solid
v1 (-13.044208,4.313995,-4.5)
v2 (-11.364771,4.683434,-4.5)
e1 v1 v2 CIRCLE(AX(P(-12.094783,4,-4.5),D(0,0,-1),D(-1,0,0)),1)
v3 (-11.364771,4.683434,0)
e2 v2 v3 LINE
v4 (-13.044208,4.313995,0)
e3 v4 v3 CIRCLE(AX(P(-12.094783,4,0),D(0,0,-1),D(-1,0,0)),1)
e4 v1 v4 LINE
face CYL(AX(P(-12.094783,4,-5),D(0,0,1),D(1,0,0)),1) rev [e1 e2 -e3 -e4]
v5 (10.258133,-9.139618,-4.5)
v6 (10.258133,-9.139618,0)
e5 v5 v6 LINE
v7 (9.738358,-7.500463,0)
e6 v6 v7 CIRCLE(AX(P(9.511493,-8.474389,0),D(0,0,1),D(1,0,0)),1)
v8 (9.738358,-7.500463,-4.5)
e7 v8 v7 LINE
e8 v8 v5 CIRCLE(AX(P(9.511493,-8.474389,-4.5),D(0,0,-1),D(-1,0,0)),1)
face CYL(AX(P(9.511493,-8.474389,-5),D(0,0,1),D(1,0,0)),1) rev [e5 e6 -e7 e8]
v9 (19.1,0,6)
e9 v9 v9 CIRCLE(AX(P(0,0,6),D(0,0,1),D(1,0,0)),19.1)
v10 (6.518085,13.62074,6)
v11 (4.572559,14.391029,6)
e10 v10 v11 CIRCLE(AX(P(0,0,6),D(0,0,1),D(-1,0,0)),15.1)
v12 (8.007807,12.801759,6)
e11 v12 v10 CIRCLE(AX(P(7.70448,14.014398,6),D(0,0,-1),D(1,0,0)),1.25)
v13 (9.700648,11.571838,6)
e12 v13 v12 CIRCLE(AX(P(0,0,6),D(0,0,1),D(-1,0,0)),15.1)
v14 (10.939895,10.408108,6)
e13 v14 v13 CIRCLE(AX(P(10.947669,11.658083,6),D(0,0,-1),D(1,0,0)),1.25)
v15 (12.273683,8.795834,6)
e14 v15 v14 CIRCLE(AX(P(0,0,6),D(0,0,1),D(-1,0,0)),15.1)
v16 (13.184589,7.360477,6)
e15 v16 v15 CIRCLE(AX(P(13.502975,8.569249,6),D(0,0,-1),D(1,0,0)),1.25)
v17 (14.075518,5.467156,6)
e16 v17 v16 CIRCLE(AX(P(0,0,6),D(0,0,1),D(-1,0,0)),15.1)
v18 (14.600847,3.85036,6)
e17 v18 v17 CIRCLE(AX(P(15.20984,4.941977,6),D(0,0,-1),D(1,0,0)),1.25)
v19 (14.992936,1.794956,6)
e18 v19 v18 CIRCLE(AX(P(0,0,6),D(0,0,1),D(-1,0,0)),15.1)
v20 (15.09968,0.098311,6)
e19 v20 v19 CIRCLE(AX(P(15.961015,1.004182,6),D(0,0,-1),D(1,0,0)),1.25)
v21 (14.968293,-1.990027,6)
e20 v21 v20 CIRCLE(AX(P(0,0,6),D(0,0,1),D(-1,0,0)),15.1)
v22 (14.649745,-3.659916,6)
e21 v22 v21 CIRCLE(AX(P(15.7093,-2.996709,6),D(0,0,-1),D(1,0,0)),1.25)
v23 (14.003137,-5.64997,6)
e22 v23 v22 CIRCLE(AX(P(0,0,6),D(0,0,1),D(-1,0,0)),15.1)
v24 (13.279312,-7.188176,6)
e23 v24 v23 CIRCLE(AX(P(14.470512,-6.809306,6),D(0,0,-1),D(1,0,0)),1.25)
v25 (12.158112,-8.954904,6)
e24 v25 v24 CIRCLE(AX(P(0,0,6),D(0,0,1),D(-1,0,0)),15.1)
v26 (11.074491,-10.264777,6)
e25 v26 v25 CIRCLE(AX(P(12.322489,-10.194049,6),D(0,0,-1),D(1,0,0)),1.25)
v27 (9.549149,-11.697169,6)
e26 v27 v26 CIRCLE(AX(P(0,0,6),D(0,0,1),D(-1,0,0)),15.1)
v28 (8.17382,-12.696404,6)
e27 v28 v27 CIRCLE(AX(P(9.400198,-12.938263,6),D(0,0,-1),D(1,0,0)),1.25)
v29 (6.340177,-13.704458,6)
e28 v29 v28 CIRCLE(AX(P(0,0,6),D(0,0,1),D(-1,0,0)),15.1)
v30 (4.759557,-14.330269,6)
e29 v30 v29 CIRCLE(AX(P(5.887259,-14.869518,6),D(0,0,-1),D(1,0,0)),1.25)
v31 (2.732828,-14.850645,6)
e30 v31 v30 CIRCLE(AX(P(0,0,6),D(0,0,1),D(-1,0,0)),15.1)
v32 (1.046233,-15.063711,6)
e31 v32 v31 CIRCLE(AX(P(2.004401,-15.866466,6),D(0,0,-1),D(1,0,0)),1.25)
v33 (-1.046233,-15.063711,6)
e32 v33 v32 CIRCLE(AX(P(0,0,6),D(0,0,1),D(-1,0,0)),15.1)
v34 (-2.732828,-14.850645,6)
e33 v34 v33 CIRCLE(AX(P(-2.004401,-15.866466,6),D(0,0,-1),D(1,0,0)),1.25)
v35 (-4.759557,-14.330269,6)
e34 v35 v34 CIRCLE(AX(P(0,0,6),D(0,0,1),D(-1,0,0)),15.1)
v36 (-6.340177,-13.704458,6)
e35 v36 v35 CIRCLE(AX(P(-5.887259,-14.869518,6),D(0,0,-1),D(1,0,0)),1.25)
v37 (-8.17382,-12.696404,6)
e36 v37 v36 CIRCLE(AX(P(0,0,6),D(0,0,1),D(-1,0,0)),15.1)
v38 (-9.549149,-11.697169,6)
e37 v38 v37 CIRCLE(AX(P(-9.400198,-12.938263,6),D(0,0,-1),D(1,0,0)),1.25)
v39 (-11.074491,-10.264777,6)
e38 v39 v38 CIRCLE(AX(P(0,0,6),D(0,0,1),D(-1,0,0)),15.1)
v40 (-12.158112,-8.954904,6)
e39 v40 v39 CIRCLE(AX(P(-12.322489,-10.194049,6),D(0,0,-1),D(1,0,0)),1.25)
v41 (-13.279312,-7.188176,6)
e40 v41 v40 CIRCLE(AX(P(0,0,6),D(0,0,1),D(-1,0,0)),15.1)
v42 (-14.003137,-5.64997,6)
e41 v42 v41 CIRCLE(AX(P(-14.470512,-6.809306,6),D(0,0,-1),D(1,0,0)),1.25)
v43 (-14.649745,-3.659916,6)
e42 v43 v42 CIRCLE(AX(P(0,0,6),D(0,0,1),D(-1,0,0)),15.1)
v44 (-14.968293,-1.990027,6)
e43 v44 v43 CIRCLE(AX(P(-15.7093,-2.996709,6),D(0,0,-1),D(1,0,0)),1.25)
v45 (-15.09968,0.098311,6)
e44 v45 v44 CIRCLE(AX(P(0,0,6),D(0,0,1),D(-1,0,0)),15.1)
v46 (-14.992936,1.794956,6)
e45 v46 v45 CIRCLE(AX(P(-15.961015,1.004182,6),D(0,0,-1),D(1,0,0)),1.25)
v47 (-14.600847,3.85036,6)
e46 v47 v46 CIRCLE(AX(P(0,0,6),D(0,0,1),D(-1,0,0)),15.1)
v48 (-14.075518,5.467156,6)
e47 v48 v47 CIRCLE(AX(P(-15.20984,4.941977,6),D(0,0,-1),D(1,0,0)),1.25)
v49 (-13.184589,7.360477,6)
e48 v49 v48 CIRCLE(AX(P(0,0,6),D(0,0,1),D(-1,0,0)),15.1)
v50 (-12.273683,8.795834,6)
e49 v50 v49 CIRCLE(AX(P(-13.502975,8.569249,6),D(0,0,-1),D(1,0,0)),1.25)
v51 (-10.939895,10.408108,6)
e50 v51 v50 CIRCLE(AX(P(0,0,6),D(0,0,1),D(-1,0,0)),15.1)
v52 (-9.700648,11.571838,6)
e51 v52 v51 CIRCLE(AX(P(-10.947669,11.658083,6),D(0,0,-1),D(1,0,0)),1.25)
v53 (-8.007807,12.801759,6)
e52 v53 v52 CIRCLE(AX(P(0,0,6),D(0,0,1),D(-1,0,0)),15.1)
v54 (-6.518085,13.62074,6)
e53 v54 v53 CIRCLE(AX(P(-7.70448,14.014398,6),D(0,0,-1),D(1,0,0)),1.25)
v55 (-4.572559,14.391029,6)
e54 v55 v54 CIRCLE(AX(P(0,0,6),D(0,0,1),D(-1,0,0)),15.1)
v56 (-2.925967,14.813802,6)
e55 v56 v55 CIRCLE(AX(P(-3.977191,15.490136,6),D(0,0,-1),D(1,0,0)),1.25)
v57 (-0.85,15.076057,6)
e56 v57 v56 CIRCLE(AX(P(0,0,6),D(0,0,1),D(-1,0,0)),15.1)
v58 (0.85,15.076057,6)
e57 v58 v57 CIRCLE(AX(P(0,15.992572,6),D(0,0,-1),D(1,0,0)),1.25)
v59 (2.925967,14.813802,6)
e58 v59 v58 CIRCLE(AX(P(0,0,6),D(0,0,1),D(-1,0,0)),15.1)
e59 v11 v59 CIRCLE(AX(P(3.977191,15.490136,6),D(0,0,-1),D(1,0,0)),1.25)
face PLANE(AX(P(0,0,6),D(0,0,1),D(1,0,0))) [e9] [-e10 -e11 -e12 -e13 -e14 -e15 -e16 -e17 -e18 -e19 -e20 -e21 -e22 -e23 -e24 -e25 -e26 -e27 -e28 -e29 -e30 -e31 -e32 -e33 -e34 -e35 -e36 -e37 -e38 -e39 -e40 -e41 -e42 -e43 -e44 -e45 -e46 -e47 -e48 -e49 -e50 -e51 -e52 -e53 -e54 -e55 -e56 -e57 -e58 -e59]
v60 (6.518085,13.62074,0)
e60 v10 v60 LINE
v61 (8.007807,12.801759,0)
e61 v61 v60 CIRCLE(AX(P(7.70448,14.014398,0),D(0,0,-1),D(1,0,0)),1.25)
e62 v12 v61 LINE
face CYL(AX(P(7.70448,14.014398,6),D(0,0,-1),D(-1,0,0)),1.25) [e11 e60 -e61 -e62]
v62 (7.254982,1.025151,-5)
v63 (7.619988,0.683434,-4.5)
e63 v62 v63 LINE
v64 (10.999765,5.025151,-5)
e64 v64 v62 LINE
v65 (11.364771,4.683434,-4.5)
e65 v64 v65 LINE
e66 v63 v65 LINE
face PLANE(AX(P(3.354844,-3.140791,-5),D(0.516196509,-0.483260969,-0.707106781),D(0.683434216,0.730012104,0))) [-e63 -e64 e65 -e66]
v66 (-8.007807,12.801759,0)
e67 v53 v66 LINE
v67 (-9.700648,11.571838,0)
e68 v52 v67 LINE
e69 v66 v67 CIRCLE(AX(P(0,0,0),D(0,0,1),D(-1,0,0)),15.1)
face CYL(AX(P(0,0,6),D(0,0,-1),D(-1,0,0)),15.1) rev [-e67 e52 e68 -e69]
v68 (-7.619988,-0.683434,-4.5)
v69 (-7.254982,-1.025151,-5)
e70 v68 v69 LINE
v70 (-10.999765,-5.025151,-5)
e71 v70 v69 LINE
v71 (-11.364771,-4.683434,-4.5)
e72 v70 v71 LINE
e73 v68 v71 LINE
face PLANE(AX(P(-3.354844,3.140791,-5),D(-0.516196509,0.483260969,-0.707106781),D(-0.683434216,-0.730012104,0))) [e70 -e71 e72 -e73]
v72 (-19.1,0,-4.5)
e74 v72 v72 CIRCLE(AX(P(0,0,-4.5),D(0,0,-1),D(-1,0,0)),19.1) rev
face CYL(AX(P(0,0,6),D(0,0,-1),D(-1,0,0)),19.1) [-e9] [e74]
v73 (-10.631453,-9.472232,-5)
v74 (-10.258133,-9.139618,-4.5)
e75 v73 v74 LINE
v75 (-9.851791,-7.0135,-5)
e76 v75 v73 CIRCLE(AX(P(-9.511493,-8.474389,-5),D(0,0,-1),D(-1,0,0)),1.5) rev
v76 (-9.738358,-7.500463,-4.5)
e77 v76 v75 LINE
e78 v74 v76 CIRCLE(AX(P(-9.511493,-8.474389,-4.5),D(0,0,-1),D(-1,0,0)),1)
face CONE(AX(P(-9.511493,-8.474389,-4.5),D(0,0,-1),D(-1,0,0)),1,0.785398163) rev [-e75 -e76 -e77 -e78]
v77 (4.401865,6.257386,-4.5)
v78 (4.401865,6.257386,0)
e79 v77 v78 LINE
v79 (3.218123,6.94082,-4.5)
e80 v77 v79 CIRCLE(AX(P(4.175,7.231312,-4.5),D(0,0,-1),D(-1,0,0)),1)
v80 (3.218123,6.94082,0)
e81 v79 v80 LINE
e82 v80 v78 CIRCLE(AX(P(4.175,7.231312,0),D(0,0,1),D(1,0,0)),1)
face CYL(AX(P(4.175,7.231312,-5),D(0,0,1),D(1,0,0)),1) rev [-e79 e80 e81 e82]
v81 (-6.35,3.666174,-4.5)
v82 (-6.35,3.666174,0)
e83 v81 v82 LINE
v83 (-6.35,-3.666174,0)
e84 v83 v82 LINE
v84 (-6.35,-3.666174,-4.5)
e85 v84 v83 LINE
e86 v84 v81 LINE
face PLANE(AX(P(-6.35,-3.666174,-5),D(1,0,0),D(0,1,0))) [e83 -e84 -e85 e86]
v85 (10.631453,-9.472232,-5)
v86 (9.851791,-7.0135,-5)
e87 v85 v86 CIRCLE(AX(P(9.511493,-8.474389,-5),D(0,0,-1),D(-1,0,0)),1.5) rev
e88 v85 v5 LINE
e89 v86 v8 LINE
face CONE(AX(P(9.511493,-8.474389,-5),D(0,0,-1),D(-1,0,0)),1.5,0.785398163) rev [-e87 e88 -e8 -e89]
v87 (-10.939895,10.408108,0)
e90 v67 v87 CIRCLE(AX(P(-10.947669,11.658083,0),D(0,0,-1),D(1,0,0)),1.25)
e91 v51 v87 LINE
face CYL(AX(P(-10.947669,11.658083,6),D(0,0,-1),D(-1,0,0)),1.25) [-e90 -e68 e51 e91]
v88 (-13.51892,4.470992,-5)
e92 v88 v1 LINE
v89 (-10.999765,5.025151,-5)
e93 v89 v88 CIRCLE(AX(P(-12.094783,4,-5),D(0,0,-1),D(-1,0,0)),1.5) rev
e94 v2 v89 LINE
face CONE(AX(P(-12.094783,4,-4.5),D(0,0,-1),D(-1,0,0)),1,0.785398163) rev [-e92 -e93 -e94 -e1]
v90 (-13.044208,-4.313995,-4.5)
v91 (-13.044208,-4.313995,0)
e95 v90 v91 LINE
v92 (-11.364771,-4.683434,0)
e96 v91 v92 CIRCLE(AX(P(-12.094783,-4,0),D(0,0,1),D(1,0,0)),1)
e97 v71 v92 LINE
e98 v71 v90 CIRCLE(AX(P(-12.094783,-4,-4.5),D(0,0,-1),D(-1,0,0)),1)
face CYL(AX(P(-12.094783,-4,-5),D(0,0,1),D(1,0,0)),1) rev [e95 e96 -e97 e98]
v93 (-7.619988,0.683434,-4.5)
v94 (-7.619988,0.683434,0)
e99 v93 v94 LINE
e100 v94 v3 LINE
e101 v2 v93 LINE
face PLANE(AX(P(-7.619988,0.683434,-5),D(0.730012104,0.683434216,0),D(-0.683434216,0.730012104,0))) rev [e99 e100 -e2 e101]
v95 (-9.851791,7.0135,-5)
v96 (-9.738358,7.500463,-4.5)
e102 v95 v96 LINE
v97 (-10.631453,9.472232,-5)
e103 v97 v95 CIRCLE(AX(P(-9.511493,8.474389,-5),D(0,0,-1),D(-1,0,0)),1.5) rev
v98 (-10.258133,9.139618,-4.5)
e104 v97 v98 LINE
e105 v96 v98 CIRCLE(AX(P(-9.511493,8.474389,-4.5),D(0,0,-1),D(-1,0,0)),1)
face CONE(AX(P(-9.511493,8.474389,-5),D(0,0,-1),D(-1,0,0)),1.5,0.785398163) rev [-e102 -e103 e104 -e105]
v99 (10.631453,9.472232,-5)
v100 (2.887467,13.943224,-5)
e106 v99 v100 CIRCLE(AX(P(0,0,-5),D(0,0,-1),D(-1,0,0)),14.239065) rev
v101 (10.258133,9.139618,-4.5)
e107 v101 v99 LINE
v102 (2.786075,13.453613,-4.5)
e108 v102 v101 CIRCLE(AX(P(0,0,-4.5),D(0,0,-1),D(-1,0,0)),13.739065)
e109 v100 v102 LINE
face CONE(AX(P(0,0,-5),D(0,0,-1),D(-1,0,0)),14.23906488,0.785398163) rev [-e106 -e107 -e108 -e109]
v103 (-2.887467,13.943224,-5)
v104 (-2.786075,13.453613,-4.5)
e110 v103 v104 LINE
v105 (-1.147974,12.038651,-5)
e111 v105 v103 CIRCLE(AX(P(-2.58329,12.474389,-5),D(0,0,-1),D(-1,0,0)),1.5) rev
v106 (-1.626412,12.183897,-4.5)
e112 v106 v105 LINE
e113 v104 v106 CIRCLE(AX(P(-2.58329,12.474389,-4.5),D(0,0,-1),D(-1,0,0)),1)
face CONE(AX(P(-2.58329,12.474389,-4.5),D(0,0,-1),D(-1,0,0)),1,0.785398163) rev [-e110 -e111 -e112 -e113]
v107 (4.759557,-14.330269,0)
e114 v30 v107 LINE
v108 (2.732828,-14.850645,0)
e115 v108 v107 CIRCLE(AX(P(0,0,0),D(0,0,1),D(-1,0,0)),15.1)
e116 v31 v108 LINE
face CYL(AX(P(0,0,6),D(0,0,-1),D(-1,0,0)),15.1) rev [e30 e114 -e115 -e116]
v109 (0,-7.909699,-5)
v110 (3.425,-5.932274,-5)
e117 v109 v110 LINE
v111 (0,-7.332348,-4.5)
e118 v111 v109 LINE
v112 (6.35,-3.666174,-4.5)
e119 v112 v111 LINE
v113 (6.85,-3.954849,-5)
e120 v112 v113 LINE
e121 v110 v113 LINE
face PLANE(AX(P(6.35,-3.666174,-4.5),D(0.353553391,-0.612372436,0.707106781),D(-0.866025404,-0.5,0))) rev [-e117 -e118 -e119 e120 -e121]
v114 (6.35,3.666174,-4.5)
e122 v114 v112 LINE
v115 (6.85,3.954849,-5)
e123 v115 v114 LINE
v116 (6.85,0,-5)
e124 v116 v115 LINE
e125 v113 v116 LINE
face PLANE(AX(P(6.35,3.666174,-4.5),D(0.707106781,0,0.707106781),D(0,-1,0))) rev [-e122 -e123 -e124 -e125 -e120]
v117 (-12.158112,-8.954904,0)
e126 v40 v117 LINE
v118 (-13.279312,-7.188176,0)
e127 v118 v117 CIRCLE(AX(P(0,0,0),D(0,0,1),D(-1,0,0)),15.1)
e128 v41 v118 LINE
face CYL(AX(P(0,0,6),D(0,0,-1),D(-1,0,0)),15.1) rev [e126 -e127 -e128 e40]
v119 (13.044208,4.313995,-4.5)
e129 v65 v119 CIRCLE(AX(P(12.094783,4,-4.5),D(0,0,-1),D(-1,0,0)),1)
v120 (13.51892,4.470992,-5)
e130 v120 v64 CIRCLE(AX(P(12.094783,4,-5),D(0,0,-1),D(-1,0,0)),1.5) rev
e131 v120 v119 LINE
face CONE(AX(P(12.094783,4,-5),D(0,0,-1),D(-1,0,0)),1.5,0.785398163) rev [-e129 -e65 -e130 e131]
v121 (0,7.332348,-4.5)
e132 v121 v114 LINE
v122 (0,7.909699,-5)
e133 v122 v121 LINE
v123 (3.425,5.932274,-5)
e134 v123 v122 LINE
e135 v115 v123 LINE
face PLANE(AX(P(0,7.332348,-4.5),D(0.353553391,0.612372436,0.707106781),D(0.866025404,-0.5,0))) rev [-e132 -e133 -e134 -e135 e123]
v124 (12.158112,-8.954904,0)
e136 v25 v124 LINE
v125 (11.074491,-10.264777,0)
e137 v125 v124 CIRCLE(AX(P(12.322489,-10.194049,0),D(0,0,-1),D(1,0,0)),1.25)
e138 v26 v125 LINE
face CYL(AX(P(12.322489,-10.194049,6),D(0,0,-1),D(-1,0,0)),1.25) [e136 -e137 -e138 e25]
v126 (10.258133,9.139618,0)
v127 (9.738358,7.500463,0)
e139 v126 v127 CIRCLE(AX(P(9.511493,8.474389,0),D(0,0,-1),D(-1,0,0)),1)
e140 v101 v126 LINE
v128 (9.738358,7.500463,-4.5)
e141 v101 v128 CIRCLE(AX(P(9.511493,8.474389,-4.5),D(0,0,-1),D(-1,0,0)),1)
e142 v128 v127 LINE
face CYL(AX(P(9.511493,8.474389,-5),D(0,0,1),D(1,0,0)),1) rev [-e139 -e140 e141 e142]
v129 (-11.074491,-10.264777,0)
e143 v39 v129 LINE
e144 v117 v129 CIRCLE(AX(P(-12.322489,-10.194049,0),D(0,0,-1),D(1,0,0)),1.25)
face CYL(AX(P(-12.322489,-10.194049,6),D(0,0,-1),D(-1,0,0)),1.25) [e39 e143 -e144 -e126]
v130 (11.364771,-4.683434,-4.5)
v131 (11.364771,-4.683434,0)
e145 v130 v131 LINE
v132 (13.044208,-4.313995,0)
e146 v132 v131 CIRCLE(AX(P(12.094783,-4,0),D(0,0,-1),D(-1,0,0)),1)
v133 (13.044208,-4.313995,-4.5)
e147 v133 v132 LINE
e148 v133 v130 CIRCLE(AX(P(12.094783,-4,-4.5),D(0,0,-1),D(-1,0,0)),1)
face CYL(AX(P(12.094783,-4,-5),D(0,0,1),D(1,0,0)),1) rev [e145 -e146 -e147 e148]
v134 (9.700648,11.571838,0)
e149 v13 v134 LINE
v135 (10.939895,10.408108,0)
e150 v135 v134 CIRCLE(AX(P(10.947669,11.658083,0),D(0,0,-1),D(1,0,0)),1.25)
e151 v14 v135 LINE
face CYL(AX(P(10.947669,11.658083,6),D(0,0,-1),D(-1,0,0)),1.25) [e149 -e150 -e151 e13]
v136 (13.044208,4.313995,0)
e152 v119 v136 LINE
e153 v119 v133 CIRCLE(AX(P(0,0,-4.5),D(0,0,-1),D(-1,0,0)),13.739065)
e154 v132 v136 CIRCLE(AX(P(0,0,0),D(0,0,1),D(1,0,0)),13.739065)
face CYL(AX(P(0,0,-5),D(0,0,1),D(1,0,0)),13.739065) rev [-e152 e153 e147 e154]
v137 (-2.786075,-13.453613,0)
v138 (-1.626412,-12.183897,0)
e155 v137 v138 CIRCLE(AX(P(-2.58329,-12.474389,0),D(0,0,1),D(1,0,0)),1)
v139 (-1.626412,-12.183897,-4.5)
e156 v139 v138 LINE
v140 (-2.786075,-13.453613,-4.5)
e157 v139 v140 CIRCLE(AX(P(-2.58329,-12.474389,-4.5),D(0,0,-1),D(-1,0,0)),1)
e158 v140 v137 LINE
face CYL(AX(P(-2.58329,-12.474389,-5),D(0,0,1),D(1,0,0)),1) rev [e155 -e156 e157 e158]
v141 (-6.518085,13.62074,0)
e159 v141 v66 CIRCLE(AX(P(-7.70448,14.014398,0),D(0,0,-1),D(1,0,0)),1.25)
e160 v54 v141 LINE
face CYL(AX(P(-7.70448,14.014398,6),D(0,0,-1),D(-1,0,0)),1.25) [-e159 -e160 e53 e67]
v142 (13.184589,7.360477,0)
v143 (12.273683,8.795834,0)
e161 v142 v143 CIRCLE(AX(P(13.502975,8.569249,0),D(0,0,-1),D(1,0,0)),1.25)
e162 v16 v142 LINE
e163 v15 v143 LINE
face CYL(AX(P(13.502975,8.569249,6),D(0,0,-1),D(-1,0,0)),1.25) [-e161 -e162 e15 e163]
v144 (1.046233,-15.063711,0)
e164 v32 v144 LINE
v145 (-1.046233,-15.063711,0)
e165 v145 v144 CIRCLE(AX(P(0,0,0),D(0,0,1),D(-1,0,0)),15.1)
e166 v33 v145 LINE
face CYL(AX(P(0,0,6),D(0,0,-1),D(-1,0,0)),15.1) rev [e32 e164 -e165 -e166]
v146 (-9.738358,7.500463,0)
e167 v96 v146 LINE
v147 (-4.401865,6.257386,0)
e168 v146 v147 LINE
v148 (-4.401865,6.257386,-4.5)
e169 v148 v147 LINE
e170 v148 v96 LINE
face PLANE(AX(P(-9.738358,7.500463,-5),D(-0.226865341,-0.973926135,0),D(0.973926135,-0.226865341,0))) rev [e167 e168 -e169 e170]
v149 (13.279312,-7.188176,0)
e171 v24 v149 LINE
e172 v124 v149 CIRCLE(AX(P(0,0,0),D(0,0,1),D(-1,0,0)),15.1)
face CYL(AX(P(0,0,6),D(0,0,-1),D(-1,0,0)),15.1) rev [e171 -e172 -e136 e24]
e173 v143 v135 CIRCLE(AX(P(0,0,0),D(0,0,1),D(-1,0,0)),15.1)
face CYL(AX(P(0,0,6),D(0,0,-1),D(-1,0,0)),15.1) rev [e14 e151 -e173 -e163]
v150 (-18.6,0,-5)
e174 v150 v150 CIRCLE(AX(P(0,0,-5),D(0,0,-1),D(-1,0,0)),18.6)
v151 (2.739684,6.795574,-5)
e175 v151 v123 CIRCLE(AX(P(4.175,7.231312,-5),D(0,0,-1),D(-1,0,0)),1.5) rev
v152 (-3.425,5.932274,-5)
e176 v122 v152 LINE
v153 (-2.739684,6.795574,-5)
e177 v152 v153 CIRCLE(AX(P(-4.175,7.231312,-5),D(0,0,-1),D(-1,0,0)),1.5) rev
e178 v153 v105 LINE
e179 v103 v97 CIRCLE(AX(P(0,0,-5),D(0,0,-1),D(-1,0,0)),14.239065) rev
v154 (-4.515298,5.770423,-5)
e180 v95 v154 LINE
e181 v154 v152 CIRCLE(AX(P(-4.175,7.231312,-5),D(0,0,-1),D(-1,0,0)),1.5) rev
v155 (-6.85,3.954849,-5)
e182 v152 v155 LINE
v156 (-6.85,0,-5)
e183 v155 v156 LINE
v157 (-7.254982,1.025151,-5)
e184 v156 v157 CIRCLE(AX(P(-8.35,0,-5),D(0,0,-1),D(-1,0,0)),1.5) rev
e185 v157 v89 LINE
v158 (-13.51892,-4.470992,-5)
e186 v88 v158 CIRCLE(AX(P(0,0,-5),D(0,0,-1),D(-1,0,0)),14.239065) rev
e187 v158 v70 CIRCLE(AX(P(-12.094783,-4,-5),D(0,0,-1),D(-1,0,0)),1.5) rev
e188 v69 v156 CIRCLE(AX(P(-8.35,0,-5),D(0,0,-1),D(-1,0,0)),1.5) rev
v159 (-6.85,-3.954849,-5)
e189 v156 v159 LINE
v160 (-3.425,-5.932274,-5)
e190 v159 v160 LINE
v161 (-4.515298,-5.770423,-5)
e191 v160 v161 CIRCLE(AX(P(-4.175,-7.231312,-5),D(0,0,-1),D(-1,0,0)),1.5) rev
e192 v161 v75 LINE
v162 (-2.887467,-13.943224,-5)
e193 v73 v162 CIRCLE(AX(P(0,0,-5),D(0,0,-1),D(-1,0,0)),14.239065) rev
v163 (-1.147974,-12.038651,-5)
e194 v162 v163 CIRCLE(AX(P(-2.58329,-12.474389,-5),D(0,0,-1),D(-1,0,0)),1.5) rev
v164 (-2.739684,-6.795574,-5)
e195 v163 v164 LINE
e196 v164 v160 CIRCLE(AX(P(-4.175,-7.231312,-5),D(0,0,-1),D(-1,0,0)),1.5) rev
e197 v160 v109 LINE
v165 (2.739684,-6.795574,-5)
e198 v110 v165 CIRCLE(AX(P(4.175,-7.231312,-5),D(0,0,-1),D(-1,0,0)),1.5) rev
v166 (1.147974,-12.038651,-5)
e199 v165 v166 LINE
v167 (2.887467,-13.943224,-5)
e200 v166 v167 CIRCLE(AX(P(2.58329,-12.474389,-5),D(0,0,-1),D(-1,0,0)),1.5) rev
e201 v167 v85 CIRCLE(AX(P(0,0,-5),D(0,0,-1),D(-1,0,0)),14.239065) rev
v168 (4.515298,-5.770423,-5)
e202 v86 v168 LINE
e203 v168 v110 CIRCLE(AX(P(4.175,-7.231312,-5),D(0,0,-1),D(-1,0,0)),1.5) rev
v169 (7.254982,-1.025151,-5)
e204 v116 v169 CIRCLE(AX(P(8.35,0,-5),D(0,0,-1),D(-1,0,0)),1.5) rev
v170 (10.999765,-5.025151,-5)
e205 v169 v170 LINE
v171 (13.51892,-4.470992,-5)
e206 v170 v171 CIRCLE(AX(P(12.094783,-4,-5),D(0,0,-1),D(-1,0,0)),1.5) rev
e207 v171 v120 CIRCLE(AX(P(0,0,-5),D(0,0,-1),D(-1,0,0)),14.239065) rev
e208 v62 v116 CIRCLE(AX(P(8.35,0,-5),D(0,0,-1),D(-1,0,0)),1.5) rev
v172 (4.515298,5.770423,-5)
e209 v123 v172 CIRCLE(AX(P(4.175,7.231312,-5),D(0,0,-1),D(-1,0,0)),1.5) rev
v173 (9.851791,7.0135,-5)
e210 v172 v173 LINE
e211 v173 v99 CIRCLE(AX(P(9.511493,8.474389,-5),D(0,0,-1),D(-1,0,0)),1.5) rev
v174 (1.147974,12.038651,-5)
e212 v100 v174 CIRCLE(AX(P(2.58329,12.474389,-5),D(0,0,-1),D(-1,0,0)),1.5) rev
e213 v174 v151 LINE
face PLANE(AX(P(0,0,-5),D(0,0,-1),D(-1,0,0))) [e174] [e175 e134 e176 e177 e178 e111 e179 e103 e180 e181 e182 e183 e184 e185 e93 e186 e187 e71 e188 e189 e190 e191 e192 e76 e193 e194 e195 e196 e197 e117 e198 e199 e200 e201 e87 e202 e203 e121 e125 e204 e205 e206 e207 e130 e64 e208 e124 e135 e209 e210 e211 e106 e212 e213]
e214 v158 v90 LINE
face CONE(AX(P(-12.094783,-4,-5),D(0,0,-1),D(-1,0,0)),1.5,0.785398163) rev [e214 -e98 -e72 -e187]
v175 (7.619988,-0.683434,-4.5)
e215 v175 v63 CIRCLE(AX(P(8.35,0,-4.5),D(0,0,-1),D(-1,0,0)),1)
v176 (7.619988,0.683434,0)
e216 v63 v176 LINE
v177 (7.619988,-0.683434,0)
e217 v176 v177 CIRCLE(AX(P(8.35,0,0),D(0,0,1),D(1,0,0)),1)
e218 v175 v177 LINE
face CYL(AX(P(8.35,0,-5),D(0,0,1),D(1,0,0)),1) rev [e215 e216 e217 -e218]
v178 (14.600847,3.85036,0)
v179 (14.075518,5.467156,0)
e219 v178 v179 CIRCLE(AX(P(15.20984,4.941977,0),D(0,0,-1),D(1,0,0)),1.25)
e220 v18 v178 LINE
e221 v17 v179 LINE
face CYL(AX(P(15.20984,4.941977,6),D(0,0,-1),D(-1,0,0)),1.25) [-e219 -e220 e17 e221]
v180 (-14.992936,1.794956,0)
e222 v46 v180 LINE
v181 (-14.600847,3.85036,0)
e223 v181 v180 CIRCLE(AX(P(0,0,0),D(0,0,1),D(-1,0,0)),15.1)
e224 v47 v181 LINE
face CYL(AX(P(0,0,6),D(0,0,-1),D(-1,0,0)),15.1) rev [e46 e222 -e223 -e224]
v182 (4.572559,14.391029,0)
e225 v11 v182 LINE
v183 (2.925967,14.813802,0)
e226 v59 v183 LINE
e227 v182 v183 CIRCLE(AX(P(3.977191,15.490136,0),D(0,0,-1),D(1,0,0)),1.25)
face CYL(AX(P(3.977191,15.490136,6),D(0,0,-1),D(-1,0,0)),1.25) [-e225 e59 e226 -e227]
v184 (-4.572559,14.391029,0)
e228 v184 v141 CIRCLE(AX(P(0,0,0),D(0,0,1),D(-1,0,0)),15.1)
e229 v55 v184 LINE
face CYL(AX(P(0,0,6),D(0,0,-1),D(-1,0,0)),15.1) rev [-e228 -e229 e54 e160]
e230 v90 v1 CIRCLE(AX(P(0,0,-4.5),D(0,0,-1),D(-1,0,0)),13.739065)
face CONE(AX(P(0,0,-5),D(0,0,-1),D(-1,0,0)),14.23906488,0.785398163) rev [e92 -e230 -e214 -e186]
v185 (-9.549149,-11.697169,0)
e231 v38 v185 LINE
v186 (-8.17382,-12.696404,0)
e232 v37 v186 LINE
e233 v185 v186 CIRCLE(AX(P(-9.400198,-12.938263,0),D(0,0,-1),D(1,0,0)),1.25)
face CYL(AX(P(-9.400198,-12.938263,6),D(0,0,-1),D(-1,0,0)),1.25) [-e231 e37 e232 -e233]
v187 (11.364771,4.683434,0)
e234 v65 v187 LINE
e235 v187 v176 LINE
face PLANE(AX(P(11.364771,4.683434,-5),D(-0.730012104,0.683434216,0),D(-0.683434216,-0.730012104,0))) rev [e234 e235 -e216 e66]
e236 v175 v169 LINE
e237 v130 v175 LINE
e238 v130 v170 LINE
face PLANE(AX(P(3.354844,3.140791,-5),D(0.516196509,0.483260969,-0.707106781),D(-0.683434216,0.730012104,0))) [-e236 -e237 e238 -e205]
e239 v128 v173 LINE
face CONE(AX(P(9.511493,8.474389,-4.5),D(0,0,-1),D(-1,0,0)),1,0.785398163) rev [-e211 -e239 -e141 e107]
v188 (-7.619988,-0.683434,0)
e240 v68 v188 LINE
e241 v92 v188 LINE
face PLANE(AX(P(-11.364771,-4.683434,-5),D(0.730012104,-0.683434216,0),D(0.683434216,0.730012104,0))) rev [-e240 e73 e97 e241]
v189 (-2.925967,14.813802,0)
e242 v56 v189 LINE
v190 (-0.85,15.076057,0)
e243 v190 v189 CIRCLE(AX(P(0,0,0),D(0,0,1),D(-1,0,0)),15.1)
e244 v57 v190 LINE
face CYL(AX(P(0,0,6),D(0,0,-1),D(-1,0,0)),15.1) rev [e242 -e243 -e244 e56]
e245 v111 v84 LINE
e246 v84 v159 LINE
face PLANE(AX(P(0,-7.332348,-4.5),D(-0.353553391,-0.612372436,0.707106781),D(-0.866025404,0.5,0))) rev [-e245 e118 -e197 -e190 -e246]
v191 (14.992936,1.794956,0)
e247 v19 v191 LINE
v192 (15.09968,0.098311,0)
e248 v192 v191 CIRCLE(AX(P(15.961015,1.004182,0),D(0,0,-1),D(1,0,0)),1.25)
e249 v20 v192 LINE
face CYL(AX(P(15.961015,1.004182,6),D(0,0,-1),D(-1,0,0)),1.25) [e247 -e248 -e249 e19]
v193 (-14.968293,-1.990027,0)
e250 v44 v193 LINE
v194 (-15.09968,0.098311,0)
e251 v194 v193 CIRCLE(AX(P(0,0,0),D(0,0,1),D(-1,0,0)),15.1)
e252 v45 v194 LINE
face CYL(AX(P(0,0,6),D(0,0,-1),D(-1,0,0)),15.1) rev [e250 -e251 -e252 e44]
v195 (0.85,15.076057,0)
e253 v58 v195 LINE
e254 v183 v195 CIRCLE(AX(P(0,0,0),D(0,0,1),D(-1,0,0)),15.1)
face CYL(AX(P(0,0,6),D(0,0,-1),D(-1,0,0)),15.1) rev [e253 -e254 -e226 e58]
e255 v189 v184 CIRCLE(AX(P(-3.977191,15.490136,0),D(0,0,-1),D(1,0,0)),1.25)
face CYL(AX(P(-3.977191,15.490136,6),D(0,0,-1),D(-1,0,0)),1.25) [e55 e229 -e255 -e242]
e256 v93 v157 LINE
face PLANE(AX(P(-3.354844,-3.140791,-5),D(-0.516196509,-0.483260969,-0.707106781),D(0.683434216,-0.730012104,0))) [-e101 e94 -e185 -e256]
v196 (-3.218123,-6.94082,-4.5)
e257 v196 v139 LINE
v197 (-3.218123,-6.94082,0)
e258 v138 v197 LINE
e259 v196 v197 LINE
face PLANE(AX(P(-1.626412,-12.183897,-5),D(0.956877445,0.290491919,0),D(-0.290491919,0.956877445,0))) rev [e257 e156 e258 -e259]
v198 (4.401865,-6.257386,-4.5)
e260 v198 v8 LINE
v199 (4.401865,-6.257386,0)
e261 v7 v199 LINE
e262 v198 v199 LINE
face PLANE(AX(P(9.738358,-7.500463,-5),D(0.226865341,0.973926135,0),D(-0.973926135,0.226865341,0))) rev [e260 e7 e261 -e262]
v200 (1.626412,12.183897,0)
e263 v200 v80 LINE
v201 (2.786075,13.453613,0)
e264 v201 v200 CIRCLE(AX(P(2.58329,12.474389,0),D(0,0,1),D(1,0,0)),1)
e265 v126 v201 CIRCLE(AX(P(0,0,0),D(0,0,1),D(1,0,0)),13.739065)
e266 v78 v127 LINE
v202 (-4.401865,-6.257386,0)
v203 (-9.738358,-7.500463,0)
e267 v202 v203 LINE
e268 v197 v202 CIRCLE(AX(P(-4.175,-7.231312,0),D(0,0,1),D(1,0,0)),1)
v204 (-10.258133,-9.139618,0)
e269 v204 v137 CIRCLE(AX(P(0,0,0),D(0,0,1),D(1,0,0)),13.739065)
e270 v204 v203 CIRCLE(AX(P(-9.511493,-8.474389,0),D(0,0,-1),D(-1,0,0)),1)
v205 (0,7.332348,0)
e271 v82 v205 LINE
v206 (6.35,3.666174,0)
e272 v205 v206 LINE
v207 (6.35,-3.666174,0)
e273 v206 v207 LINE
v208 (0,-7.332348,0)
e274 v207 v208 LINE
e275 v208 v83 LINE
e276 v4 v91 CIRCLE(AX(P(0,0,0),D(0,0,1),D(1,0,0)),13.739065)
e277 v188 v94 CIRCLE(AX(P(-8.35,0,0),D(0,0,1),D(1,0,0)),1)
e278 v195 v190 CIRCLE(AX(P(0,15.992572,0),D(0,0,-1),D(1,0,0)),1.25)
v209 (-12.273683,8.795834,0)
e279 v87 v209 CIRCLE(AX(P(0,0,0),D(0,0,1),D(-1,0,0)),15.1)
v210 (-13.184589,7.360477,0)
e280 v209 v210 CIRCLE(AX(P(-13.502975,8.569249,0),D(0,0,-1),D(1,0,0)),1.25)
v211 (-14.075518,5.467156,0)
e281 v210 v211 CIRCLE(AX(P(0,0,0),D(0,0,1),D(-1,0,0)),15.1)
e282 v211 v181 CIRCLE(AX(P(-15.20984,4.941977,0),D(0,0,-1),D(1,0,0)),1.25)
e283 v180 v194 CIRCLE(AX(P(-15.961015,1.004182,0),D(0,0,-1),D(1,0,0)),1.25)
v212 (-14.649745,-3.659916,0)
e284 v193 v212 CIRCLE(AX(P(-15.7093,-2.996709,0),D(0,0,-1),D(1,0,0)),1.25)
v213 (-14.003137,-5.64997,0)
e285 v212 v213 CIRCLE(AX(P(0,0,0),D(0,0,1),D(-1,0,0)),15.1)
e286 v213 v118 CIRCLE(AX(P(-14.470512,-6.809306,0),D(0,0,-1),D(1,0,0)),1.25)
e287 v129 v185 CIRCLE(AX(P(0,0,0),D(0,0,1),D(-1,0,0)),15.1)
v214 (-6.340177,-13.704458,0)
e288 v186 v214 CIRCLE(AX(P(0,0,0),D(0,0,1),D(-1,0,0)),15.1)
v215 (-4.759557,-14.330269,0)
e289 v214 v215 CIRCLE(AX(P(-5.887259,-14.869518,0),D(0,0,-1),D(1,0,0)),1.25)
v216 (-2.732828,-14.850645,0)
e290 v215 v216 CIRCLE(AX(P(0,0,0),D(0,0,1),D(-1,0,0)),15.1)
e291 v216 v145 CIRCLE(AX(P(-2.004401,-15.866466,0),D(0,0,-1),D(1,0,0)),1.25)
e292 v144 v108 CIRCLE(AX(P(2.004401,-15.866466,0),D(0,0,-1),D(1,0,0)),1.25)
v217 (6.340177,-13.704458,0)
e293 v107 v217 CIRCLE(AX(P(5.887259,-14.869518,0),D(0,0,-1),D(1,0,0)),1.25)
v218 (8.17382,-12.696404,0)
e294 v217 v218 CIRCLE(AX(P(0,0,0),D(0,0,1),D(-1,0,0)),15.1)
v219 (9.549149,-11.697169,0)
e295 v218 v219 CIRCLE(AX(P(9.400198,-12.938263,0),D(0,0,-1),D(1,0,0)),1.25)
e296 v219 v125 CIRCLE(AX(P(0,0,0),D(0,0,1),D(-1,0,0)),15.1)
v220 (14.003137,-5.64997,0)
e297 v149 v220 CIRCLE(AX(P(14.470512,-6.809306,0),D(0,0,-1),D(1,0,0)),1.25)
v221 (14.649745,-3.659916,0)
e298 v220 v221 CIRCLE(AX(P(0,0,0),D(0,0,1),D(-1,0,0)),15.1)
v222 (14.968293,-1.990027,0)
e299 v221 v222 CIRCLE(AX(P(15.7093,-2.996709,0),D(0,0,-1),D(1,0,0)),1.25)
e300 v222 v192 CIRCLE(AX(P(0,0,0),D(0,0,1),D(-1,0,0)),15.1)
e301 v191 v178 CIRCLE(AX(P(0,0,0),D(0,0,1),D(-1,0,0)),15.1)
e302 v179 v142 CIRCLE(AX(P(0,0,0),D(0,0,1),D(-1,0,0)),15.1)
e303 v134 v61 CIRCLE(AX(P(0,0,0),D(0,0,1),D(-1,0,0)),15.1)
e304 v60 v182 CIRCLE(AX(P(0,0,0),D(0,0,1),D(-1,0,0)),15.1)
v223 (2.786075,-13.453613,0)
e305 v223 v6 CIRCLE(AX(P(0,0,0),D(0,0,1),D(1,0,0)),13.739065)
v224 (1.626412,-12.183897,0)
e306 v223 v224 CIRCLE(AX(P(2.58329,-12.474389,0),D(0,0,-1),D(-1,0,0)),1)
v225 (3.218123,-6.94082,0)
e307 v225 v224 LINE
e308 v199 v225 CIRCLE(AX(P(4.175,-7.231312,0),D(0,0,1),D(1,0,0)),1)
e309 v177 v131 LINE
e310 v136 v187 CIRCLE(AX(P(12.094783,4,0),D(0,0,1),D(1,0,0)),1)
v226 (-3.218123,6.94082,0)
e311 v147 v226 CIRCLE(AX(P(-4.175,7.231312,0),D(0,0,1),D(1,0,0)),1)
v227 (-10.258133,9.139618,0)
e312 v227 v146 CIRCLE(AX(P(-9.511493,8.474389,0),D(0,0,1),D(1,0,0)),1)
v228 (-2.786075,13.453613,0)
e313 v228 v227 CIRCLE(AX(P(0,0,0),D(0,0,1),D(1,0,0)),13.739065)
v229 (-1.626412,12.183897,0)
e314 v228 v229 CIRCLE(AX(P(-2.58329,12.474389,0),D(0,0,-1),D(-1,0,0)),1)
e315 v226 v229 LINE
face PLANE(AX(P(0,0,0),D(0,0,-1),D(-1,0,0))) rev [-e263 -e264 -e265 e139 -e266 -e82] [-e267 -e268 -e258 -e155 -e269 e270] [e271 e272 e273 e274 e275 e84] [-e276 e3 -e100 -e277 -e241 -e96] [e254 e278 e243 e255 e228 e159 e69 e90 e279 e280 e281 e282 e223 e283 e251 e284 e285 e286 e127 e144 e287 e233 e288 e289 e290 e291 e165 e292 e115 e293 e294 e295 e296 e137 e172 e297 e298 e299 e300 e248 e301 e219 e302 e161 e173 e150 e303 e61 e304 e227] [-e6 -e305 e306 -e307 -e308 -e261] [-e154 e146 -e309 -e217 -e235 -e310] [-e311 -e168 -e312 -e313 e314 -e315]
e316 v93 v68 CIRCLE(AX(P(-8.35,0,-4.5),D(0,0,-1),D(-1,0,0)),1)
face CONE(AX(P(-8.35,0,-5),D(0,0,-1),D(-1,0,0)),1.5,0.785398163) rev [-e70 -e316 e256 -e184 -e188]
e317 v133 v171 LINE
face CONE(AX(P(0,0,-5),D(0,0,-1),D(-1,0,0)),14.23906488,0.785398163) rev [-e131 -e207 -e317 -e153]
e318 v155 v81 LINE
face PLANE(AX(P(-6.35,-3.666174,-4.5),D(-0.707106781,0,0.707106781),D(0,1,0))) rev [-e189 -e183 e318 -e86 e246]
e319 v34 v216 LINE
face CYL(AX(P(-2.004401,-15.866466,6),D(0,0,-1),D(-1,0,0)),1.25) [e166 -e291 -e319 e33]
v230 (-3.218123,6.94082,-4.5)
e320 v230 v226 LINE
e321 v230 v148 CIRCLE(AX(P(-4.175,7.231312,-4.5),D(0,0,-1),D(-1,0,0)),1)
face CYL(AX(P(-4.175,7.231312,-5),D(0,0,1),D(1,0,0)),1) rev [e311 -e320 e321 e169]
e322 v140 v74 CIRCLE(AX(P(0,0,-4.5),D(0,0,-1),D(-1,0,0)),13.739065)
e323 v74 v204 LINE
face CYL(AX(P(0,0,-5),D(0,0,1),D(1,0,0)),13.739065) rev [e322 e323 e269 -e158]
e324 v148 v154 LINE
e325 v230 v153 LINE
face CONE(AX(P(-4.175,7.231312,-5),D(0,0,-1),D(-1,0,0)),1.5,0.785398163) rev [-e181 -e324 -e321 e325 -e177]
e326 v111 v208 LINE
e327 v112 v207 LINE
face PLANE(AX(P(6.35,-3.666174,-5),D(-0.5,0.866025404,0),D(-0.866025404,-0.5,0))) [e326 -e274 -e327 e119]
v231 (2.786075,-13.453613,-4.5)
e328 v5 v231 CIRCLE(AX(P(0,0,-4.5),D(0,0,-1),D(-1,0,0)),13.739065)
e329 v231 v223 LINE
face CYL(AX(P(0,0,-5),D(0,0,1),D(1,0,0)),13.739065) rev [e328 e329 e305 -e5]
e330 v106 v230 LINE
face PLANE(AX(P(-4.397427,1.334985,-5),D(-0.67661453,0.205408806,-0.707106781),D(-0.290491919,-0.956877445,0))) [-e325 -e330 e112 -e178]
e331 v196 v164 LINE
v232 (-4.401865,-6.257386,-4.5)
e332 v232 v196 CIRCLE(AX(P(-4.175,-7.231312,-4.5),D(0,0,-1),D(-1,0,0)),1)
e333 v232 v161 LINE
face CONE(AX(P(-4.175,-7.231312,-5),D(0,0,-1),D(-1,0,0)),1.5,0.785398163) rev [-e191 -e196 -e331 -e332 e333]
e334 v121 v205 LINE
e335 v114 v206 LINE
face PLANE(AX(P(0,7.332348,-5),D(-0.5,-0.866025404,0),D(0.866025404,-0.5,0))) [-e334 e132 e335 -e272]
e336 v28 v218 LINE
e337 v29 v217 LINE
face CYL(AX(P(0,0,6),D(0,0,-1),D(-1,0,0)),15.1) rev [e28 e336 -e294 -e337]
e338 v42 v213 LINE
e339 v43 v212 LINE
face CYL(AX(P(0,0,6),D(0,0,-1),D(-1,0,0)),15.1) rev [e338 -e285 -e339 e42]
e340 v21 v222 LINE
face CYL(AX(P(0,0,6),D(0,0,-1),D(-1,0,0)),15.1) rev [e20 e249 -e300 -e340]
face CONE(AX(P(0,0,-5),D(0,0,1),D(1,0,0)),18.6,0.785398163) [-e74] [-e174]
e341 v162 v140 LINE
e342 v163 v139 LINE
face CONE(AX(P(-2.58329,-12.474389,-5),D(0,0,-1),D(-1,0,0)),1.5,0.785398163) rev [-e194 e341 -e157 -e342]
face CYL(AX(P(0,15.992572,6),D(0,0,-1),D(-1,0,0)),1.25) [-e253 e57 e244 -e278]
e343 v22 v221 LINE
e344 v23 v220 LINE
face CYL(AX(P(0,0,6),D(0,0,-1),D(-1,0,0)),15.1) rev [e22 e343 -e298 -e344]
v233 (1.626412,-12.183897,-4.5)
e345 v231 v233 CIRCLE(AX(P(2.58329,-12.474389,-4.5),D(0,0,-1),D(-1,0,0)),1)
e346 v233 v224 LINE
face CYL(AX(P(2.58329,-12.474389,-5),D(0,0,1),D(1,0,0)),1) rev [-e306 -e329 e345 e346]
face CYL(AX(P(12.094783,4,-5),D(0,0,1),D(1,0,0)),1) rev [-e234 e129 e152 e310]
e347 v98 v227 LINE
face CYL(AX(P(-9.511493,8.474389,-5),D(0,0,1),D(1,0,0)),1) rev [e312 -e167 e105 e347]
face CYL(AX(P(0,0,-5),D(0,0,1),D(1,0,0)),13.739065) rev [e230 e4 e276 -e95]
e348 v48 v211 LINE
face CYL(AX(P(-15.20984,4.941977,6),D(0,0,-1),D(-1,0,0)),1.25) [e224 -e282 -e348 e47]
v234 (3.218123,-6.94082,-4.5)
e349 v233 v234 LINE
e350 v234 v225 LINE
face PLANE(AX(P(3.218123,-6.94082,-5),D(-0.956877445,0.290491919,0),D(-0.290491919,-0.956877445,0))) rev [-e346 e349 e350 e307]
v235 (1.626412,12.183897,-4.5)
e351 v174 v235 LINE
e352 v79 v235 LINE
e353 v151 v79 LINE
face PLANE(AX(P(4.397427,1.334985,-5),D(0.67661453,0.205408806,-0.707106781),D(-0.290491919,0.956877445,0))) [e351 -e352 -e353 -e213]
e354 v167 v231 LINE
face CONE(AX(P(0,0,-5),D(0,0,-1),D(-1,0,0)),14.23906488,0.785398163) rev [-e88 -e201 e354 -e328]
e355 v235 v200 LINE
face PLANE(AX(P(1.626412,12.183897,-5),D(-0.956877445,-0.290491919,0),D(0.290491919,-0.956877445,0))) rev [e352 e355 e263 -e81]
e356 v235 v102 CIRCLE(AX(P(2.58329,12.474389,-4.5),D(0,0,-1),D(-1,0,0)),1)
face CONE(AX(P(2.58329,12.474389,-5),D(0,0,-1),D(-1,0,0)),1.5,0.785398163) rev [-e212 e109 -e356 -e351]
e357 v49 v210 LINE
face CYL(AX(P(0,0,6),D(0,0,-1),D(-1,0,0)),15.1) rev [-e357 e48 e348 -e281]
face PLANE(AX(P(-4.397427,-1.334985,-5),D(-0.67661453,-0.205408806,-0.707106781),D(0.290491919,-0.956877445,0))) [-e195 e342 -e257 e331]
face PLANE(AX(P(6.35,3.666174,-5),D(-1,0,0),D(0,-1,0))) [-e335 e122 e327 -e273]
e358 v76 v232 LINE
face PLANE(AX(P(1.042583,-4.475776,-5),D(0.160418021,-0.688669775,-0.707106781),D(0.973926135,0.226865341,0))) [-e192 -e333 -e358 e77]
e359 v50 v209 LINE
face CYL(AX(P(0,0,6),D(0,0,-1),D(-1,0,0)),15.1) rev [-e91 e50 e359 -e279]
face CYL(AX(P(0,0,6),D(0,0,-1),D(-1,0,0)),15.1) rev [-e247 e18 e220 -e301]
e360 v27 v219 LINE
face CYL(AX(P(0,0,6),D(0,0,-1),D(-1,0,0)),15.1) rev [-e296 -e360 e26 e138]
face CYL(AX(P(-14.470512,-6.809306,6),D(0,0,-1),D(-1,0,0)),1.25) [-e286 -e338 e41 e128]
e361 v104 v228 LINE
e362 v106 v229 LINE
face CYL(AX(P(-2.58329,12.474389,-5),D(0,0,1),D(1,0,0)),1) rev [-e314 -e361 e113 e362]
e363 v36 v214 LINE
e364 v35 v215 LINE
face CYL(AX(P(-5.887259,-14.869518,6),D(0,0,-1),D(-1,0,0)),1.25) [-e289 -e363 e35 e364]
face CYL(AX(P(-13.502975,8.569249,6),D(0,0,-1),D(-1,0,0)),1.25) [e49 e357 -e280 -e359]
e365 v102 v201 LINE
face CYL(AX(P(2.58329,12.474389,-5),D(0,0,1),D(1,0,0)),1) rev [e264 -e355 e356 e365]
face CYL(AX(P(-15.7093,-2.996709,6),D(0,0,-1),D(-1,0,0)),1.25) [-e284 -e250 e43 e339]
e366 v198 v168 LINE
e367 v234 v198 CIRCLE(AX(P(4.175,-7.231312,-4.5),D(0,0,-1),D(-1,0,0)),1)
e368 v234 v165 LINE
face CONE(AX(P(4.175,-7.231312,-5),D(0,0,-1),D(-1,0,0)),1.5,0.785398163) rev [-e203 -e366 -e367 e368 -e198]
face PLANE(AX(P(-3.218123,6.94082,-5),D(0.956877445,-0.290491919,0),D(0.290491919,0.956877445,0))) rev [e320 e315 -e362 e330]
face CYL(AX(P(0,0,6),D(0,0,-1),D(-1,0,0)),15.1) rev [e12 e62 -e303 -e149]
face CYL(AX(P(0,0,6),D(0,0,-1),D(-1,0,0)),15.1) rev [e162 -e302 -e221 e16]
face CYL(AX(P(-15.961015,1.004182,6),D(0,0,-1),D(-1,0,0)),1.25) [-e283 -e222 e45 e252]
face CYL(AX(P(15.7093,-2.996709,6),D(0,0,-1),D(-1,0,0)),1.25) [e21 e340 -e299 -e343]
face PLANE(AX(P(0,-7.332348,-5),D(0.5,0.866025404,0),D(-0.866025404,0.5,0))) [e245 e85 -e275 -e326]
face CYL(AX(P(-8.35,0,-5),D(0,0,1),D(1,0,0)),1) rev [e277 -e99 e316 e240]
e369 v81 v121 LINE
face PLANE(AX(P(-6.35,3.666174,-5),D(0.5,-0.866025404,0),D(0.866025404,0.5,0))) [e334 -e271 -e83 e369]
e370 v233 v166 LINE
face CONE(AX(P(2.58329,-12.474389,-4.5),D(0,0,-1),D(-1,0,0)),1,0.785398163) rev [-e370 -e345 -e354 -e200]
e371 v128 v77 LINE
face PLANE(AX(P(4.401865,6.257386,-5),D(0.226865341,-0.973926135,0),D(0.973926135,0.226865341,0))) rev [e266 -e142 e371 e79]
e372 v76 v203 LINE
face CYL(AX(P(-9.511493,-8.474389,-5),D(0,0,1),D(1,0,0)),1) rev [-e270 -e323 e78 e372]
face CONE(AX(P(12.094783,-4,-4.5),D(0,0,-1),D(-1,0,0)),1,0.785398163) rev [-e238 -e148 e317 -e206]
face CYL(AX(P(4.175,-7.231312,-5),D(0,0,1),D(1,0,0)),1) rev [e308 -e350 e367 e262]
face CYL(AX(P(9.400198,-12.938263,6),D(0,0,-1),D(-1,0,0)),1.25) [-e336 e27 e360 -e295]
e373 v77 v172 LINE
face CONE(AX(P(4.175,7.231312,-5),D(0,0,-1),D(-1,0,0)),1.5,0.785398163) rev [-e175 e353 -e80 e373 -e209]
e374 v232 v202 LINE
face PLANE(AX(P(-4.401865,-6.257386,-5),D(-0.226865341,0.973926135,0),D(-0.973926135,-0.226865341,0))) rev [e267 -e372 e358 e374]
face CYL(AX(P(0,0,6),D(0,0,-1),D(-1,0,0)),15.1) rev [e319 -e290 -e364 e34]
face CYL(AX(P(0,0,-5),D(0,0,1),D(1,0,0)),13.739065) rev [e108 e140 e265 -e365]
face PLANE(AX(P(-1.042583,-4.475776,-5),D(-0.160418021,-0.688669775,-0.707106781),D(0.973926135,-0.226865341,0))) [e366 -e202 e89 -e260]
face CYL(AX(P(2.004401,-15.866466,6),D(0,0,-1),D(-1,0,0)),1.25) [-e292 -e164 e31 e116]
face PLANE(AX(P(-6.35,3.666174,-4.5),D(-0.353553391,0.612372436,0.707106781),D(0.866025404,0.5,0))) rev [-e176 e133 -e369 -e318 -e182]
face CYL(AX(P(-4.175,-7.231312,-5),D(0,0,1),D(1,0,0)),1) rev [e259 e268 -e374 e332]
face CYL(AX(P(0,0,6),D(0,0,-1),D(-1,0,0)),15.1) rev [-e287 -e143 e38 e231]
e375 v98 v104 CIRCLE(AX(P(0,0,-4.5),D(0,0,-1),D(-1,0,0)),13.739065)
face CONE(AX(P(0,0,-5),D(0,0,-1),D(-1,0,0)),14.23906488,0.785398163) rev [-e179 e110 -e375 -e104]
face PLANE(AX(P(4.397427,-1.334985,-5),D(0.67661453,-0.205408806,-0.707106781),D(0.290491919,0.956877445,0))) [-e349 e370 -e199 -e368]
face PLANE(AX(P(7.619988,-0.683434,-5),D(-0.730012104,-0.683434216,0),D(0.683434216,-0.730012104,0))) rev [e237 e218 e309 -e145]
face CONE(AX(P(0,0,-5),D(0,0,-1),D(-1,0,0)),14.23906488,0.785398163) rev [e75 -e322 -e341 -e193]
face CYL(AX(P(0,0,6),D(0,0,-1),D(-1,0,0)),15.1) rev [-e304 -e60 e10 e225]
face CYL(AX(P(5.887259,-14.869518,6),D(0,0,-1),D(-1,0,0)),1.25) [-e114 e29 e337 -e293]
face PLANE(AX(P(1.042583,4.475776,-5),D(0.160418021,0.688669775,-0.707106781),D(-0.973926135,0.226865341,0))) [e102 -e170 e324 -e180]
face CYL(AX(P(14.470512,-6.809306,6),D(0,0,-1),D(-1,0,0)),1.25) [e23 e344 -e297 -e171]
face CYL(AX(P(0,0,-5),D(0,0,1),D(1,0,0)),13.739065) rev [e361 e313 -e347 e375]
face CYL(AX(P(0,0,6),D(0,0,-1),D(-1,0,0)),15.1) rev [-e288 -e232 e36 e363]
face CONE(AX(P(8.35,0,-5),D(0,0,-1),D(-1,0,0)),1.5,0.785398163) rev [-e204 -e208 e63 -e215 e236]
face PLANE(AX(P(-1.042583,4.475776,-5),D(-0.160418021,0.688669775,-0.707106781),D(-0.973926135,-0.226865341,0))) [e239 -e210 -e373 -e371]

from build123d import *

# Parameters (mm, degrees)
DIAL_PROFILE_SKETCH_R        = 19.1
DIAL_PROFILE_EXTRUSION_DEPTH = 6
BOSS_EXTRUDE1_START          = 5
SOCKET_TOP_SKETCH_R          = 19.1
BOSS_EXTRUDE1_DEPTH          = 5
CHAMFER1_SIZE                = 0.5


with BuildPart() as part:
    # Dial Profile Sketch → Dial Profile Extrusion (new body)
    with BuildSketch(Plane.XY):
        Circle(DIAL_PROFILE_SKETCH_R)
        with BuildLine():
            ThreePointArc((-0.85, 15.076057177), (0, 14.742572316), (0.85, 15.076057177))
            ThreePointArc((0.85, 15.076057177), (1.892531827, 14.98093199), (2.925967271, 14.813801522))
            ThreePointArc((2.925967271, 14.813801522), (3.666328646, 14.279407297), (4.572558645, 14.391028714))
            ThreePointArc((4.572558645, 14.391028714), (5.558680746, 14.039624937), (6.518085258, 13.620740236))
            ThreePointArc((6.518085258, 13.620740236), (7.102288379, 12.919014601), (8.007806614, 12.80175899))
            ThreePointArc((8.007806614, 12.80175899), (8.87555731, 12.216156615), (9.700647976, 11.571837747))
            ThreePointArc((9.700647976, 11.571837747), (10.091985213, 10.746872706), (10.939894643, 10.408107667))
            ThreePointArc((10.939894643, 10.408107667), (11.634749966, 9.625102245), (12.273683305, 8.795834135))
            ThreePointArc((12.273683305, 8.795834135), (12.4475655, 7.899465274), (13.184588857, 7.360476661))
            ThreePointArc((13.184588857, 7.360476661), (13.662888492, 6.429267303), (14.075517973, 5.467155915))
            ThreePointArc((14.075517973, 5.467155915), (14.021019468, 4.555705386), (14.600846863, 3.850359837))
            ThreePointArc((14.600846863, 3.850359837), (14.832537486, 2.82945785), (14.99293608, 1.794956182))
            ThreePointArc((14.99293608, 1.794956182), (14.713481217, 0.925693775), (15.099679963, 0.098310743))
            ThreePointArc((15.099679963, 0.098310743), (15.070203599, -0.948136845), (14.968292873, -1.990027249))
            ThreePointArc((14.968292873, -1.990027249), (14.481440829, -2.762482581), (14.649744639, -3.659915576))
            ThreePointArc((14.649744639, -3.659915576), (14.360953396, -4.666156615), (14.003136776, -5.64996995))
            ThreePointArc((14.003136776, -5.64996995), (13.339478254, -6.277081996), (13.27931198, -7.188175939))
            ThreePointArc((13.27931198, -7.188175939), (12.749351675, -8.090984604), (12.158112095, -8.954904259))
            ThreePointArc((12.158112095, -8.954904259), (11.359347202, -9.397269265), (11.074491312, -10.264776772))
            ThreePointArc((11.074491312, -10.264776772), (10.3366613, -11.007426274), (9.549148516, -11.697169))
            ThreePointArc((9.549148516, -11.697169), (8.665466588, -11.926991544), (8.173819626, -12.696403929))
            ThreePointArc((8.173819626, -12.696403929), (7.274480479, -13.232230869), (6.340176817, -13.704457593))
            ThreePointArc((6.340176817, -13.704457593), (5.427102839, -13.707297081), (4.759556791, -14.330269333))
            ThreePointArc((4.759556791, -14.330269333), (3.755217296, -14.625605733), (2.732828491, -14.850644714))
            ThreePointArc((2.732828491, -14.850644714), (1.847734259, -14.62632273), (1.046233499, -15.063711212))
            ThreePointArc((1.046233499, -15.063711212), (0, -15.1), (-1.046233499, -15.063711212))
            ThreePointArc((-1.046233499, -15.063711212), (-1.847734259, -14.62632273), (-2.732828491, -14.850644714))
            ThreePointArc((-2.732828491, -14.850644714), (-3.755217296, -14.625605733), (-4.759556791, -14.330269333))
            ThreePointArc((-4.759556791, -14.330269333), (-5.427102839, -13.707297081), (-6.340176817, -13.704457593))
            ThreePointArc((-6.340176817, -13.704457593), (-7.274480479, -13.232230869), (-8.173819626, -12.696403929))
            ThreePointArc((-8.173819626, -12.696403929), (-8.665466588, -11.926991544), (-9.549148516, -11.697169))
            ThreePointArc((-9.549148516, -11.697169), (-10.3366613, -11.007426274), (-11.074491312, -10.264776772))
            ThreePointArc((-11.074491312, -10.264776772), (-11.359347202, -9.397269265), (-12.158112095, -8.954904259))
            ThreePointArc((-12.158112095, -8.954904259), (-12.749351675, -8.090984604), (-13.27931198, -7.188175939))
            ThreePointArc((-13.27931198, -7.188175939), (-13.339478254, -6.277081996), (-14.003136776, -5.64996995))
            ThreePointArc((-14.003136776, -5.64996995), (-14.360953396, -4.666156615), (-14.649744639, -3.659915576))
            ThreePointArc((-14.649744639, -3.659915576), (-14.481440829, -2.762482581), (-14.968292873, -1.990027249))
            ThreePointArc((-14.968292873, -1.990027249), (-15.070203599, -0.948136845), (-15.099679963, 0.098310743))
            ThreePointArc((-15.099679963, 0.098310743), (-14.713481217, 0.925693775), (-14.99293608, 1.794956182))
            ThreePointArc((-14.99293608, 1.794956182), (-14.832537486, 2.82945785), (-14.600846863, 3.850359837))
            ThreePointArc((-14.600846863, 3.850359837), (-14.021019468, 4.555705386), (-14.075517973, 5.467155915))
            ThreePointArc((-14.075517973, 5.467155915), (-13.662888492, 6.429267303), (-13.184588857, 7.360476661))
            ThreePointArc((-13.184588857, 7.360476661), (-12.4475655, 7.899465274), (-12.273683305, 8.795834135))
            ThreePointArc((-12.273683305, 8.795834135), (-11.634749966, 9.625102245), (-10.939894643, 10.408107667))
            ThreePointArc((-10.939894643, 10.408107667), (-10.091985213, 10.746872706), (-9.700647976, 11.571837747))
            ThreePointArc((-9.700647976, 11.571837747), (-8.87555731, 12.216156615), (-8.007806614, 12.80175899))
            ThreePointArc((-8.007806614, 12.80175899), (-7.102288379, 12.919014601), (-6.518085258, 13.620740236))
            ThreePointArc((-6.518085258, 13.620740236), (-5.558680746, 14.039624937), (-4.572558645, 14.391028714))
            ThreePointArc((-4.572558645, 14.391028714), (-3.666328646, 14.279407297), (-2.925967271, 14.813801522))
            ThreePointArc((-2.925967271, 14.813801522), (-1.892531827, 14.98093199), (-0.85, 15.076057177))
        make_face(mode=Mode.SUBTRACT)
    extrude(amount=DIAL_PROFILE_EXTRUSION_DEPTH)

    # Socket Top Sketch → Boss-Extrude1 (add)
    with BuildSketch(Plane(origin=(0, 0, 0), x_dir=(-1, 0, 0), z_dir=(0, 0, -1)).offset(BOSS_EXTRUDE1_START)):
        Circle(SOCKET_TOP_SKETCH_R)
        with BuildLine():
            Line((-1.626412403, 12.183897348), (-3.218122555, 6.940820202))
            ThreePointArc((-3.218122555, 6.940820202), (-3.675, 6.365286718), (-4.401865341, 6.257385986))
            Line((-4.401865341, 6.257385986), (-9.738358419, 7.500463132))
            ThreePointArc((-9.738358419, 7.500463132), (-10.464716593, 8.172122942), (-10.258132896, 9.139617786))
            ThreePointArc((-10.258132896, 9.139617786), (-6.86953244, 11.898379211), (-2.786074736, 13.453612576))
            ThreePointArc((-2.786074736, 13.453612576), (-1.844907774, 13.148771884), (-1.626412403, 12.183897348))
        make_face(mode=Mode.SUBTRACT)
        Polygon((0, 7.332348419), (-6.35, 3.666174209), (-6.35, -3.666174209), (0, -7.332348419), (6.35, -3.666174209), (6.35, 3.666174209), align=None, mode=Mode.SUBTRACT)
        with BuildLine():
            Line((3.218122555, 6.940820202), (1.626412403, 12.183897348))
            ThreePointArc((1.626412403, 12.183897348), (1.844907774, 13.148771884), (2.786074736, 13.453612576))
            ThreePointArc((2.786074736, 13.453612576), (6.86953244, 11.898379211), (10.258132896, 9.139617786))
            ThreePointArc((10.258132896, 9.139617786), (10.464716593, 8.172122942), (9.738358419, 7.500463132))
            Line((9.738358419, 7.500463132), (4.401865341, 6.257385986))
            ThreePointArc((4.401865341, 6.257385986), (3.675, 6.365286718), (3.218122555, 6.940820202))
        make_face(mode=Mode.SUBTRACT)
        with BuildLine():
            Line((7.619987896, 0.683434216), (11.364770822, 4.683434216))
            ThreePointArc((11.364770822, 4.683434216), (12.309624367, 4.976648942), (13.044207632, 4.31399479))
            ThreePointArc((13.044207632, 4.31399479), (13.73906488, 0), (13.044207632, -4.31399479))
            ThreePointArc((13.044207632, -4.31399479), (12.309624367, -4.976648942), (11.364770822, -4.683434216))
            Line((11.364770822, -4.683434216), (7.619987896, -0.683434216))
            ThreePointArc((7.619987896, -0.683434216), (7.35, 0), (7.619987896, 0.683434216))
        make_face(mode=Mode.SUBTRACT)
        with BuildLine():
            Line((4.401865341, -6.257385986), (9.738358419, -7.500463132))
            ThreePointArc((9.738358419, -7.500463132), (10.464716593, -8.172122942), (10.258132896, -9.139617786))
            ThreePointArc((10.258132896, -9.139617786), (6.86953244, -11.898379211), (2.786074736, -13.453612576))
            ThreePointArc((2.786074736, -13.453612576), (1.844907774, -13.148771884), (1.626412403, -12.183897348))
            Line((1.626412403, -12.183897348), (3.218122555, -6.940820202))
            ThreePointArc((3.218122555, -6.940820202), (3.675, -6.365286718), (4.401865341, -6.257385986))
        make_face(mode=Mode.SUBTRACT)
        with BuildLine():
            Line((-3.218122555, -6.940820202), (-1.626412403, -12.183897348))
            ThreePointArc((-1.626412403, -12.183897348), (-1.844907774, -13.148771884), (-2.786074736, -13.453612576))
            ThreePointArc((-2.786074736, -13.453612576), (-6.86953244, -11.898379211), (-10.258132896, -9.139617786))
            ThreePointArc((-10.258132896, -9.139617786), (-10.464716593, -8.172122942), (-9.738358419, -7.500463132))
            Line((-9.738358419, -7.500463132), (-4.401865341, -6.257385986))
            ThreePointArc((-4.401865341, -6.257385986), (-3.675, -6.365286718), (-3.218122555, -6.940820202))
        make_face(mode=Mode.SUBTRACT)
        with BuildLine():
            Line((-7.619987896, -0.683434216), (-11.364770822, -4.683434216))
            ThreePointArc((-11.364770822, -4.683434216), (-12.309624367, -4.976648942), (-13.044207632, -4.31399479))
            ThreePointArc((-13.044207632, -4.31399479), (-13.73906488, 0), (-13.044207632, 4.31399479))
            ThreePointArc((-13.044207632, 4.31399479), (-12.309624367, 4.976648942), (-11.364770822, 4.683434216))
            Line((-11.364770822, 4.683434216), (-7.619987896, 0.683434216))
            ThreePointArc((-7.619987896, 0.683434216), (-7.35, 0), (-7.619987896, -0.683434216))
        make_face(mode=Mode.SUBTRACT)
    extrude(amount=-BOSS_EXTRUDE1_DEPTH)

    # Chamfer1
    chamfer1_edges = [part.edges().sort_by_distance(p)[0] for p in [
        (-3.675, 6.365286718, -5),
        (-2.422267479, 9.562358775, -5),
        (-6.86953244, 11.898379211, -5),
        (-10.464716593, 8.172122942, -5),
        (-7.07011188, 6.878924559, -5),
        (-3.675, -6.365286718, -5),
        (-7.07011188, -6.878924559, -5),
        (-6.86953244, -11.898379211, -5),
        (-1.844907774, -13.148771884, -5),
        (-2.422267479, -9.562358775, -5),
        (-7.35, 0, -5),
        (-9.492379359, 2.683434216, -5),
        (-13.73906488, 0, -5),
        (-12.309624367, -4.976648942, -5),
        (-9.492379359, -2.683434216, -5),
        (3.675, 6.365286718, -5),
        (7.07011188, 6.878924559, -5),
        (6.86953244, 11.898379211, -5),
        (1.844907774, 13.148771884, -5),
        (2.422267479, 9.562358775, -5),
        (7.35, 0, -5),
        (9.492379359, -2.683434216, -5),
        (13.73906488, 0, -5),
        (12.309624367, 4.976648942, -5),
        (9.492379359, 2.683434216, -5),
        (3.675, -6.365286718, -5),
        (2.422267479, -9.562358775, -5),
        (6.86953244, -11.898379211, -5),
        (10.464716593, -8.172122942, -5),
        (7.07011188, -6.878924559, -5),
        (19.1, 0, -5),
        (1.844907774, -13.148771884, -5),
        (12.309624367, -4.976648942, -5),
        (10.464716593, 8.172122942, -5),
        (-3.175, 5.499261314, -5),
        (3.175, 5.499261314, -5),
        (6.35, 0, -5),
        (3.175, -5.499261314, -5),
        (-3.175, -5.499261314, -5),
        (-6.35, 0, -5),
        (-12.309624367, 4.976648942, -5),
        (-10.464716593, -8.172122942, -5),
        (-1.844907774, 13.148771884, -5),
    ]]
    chamfer(chamfer1_edges, length=CHAMFER1_SIZE - 0.0001)  # a hair under: the kernel refuses the full size


solid = part.part
